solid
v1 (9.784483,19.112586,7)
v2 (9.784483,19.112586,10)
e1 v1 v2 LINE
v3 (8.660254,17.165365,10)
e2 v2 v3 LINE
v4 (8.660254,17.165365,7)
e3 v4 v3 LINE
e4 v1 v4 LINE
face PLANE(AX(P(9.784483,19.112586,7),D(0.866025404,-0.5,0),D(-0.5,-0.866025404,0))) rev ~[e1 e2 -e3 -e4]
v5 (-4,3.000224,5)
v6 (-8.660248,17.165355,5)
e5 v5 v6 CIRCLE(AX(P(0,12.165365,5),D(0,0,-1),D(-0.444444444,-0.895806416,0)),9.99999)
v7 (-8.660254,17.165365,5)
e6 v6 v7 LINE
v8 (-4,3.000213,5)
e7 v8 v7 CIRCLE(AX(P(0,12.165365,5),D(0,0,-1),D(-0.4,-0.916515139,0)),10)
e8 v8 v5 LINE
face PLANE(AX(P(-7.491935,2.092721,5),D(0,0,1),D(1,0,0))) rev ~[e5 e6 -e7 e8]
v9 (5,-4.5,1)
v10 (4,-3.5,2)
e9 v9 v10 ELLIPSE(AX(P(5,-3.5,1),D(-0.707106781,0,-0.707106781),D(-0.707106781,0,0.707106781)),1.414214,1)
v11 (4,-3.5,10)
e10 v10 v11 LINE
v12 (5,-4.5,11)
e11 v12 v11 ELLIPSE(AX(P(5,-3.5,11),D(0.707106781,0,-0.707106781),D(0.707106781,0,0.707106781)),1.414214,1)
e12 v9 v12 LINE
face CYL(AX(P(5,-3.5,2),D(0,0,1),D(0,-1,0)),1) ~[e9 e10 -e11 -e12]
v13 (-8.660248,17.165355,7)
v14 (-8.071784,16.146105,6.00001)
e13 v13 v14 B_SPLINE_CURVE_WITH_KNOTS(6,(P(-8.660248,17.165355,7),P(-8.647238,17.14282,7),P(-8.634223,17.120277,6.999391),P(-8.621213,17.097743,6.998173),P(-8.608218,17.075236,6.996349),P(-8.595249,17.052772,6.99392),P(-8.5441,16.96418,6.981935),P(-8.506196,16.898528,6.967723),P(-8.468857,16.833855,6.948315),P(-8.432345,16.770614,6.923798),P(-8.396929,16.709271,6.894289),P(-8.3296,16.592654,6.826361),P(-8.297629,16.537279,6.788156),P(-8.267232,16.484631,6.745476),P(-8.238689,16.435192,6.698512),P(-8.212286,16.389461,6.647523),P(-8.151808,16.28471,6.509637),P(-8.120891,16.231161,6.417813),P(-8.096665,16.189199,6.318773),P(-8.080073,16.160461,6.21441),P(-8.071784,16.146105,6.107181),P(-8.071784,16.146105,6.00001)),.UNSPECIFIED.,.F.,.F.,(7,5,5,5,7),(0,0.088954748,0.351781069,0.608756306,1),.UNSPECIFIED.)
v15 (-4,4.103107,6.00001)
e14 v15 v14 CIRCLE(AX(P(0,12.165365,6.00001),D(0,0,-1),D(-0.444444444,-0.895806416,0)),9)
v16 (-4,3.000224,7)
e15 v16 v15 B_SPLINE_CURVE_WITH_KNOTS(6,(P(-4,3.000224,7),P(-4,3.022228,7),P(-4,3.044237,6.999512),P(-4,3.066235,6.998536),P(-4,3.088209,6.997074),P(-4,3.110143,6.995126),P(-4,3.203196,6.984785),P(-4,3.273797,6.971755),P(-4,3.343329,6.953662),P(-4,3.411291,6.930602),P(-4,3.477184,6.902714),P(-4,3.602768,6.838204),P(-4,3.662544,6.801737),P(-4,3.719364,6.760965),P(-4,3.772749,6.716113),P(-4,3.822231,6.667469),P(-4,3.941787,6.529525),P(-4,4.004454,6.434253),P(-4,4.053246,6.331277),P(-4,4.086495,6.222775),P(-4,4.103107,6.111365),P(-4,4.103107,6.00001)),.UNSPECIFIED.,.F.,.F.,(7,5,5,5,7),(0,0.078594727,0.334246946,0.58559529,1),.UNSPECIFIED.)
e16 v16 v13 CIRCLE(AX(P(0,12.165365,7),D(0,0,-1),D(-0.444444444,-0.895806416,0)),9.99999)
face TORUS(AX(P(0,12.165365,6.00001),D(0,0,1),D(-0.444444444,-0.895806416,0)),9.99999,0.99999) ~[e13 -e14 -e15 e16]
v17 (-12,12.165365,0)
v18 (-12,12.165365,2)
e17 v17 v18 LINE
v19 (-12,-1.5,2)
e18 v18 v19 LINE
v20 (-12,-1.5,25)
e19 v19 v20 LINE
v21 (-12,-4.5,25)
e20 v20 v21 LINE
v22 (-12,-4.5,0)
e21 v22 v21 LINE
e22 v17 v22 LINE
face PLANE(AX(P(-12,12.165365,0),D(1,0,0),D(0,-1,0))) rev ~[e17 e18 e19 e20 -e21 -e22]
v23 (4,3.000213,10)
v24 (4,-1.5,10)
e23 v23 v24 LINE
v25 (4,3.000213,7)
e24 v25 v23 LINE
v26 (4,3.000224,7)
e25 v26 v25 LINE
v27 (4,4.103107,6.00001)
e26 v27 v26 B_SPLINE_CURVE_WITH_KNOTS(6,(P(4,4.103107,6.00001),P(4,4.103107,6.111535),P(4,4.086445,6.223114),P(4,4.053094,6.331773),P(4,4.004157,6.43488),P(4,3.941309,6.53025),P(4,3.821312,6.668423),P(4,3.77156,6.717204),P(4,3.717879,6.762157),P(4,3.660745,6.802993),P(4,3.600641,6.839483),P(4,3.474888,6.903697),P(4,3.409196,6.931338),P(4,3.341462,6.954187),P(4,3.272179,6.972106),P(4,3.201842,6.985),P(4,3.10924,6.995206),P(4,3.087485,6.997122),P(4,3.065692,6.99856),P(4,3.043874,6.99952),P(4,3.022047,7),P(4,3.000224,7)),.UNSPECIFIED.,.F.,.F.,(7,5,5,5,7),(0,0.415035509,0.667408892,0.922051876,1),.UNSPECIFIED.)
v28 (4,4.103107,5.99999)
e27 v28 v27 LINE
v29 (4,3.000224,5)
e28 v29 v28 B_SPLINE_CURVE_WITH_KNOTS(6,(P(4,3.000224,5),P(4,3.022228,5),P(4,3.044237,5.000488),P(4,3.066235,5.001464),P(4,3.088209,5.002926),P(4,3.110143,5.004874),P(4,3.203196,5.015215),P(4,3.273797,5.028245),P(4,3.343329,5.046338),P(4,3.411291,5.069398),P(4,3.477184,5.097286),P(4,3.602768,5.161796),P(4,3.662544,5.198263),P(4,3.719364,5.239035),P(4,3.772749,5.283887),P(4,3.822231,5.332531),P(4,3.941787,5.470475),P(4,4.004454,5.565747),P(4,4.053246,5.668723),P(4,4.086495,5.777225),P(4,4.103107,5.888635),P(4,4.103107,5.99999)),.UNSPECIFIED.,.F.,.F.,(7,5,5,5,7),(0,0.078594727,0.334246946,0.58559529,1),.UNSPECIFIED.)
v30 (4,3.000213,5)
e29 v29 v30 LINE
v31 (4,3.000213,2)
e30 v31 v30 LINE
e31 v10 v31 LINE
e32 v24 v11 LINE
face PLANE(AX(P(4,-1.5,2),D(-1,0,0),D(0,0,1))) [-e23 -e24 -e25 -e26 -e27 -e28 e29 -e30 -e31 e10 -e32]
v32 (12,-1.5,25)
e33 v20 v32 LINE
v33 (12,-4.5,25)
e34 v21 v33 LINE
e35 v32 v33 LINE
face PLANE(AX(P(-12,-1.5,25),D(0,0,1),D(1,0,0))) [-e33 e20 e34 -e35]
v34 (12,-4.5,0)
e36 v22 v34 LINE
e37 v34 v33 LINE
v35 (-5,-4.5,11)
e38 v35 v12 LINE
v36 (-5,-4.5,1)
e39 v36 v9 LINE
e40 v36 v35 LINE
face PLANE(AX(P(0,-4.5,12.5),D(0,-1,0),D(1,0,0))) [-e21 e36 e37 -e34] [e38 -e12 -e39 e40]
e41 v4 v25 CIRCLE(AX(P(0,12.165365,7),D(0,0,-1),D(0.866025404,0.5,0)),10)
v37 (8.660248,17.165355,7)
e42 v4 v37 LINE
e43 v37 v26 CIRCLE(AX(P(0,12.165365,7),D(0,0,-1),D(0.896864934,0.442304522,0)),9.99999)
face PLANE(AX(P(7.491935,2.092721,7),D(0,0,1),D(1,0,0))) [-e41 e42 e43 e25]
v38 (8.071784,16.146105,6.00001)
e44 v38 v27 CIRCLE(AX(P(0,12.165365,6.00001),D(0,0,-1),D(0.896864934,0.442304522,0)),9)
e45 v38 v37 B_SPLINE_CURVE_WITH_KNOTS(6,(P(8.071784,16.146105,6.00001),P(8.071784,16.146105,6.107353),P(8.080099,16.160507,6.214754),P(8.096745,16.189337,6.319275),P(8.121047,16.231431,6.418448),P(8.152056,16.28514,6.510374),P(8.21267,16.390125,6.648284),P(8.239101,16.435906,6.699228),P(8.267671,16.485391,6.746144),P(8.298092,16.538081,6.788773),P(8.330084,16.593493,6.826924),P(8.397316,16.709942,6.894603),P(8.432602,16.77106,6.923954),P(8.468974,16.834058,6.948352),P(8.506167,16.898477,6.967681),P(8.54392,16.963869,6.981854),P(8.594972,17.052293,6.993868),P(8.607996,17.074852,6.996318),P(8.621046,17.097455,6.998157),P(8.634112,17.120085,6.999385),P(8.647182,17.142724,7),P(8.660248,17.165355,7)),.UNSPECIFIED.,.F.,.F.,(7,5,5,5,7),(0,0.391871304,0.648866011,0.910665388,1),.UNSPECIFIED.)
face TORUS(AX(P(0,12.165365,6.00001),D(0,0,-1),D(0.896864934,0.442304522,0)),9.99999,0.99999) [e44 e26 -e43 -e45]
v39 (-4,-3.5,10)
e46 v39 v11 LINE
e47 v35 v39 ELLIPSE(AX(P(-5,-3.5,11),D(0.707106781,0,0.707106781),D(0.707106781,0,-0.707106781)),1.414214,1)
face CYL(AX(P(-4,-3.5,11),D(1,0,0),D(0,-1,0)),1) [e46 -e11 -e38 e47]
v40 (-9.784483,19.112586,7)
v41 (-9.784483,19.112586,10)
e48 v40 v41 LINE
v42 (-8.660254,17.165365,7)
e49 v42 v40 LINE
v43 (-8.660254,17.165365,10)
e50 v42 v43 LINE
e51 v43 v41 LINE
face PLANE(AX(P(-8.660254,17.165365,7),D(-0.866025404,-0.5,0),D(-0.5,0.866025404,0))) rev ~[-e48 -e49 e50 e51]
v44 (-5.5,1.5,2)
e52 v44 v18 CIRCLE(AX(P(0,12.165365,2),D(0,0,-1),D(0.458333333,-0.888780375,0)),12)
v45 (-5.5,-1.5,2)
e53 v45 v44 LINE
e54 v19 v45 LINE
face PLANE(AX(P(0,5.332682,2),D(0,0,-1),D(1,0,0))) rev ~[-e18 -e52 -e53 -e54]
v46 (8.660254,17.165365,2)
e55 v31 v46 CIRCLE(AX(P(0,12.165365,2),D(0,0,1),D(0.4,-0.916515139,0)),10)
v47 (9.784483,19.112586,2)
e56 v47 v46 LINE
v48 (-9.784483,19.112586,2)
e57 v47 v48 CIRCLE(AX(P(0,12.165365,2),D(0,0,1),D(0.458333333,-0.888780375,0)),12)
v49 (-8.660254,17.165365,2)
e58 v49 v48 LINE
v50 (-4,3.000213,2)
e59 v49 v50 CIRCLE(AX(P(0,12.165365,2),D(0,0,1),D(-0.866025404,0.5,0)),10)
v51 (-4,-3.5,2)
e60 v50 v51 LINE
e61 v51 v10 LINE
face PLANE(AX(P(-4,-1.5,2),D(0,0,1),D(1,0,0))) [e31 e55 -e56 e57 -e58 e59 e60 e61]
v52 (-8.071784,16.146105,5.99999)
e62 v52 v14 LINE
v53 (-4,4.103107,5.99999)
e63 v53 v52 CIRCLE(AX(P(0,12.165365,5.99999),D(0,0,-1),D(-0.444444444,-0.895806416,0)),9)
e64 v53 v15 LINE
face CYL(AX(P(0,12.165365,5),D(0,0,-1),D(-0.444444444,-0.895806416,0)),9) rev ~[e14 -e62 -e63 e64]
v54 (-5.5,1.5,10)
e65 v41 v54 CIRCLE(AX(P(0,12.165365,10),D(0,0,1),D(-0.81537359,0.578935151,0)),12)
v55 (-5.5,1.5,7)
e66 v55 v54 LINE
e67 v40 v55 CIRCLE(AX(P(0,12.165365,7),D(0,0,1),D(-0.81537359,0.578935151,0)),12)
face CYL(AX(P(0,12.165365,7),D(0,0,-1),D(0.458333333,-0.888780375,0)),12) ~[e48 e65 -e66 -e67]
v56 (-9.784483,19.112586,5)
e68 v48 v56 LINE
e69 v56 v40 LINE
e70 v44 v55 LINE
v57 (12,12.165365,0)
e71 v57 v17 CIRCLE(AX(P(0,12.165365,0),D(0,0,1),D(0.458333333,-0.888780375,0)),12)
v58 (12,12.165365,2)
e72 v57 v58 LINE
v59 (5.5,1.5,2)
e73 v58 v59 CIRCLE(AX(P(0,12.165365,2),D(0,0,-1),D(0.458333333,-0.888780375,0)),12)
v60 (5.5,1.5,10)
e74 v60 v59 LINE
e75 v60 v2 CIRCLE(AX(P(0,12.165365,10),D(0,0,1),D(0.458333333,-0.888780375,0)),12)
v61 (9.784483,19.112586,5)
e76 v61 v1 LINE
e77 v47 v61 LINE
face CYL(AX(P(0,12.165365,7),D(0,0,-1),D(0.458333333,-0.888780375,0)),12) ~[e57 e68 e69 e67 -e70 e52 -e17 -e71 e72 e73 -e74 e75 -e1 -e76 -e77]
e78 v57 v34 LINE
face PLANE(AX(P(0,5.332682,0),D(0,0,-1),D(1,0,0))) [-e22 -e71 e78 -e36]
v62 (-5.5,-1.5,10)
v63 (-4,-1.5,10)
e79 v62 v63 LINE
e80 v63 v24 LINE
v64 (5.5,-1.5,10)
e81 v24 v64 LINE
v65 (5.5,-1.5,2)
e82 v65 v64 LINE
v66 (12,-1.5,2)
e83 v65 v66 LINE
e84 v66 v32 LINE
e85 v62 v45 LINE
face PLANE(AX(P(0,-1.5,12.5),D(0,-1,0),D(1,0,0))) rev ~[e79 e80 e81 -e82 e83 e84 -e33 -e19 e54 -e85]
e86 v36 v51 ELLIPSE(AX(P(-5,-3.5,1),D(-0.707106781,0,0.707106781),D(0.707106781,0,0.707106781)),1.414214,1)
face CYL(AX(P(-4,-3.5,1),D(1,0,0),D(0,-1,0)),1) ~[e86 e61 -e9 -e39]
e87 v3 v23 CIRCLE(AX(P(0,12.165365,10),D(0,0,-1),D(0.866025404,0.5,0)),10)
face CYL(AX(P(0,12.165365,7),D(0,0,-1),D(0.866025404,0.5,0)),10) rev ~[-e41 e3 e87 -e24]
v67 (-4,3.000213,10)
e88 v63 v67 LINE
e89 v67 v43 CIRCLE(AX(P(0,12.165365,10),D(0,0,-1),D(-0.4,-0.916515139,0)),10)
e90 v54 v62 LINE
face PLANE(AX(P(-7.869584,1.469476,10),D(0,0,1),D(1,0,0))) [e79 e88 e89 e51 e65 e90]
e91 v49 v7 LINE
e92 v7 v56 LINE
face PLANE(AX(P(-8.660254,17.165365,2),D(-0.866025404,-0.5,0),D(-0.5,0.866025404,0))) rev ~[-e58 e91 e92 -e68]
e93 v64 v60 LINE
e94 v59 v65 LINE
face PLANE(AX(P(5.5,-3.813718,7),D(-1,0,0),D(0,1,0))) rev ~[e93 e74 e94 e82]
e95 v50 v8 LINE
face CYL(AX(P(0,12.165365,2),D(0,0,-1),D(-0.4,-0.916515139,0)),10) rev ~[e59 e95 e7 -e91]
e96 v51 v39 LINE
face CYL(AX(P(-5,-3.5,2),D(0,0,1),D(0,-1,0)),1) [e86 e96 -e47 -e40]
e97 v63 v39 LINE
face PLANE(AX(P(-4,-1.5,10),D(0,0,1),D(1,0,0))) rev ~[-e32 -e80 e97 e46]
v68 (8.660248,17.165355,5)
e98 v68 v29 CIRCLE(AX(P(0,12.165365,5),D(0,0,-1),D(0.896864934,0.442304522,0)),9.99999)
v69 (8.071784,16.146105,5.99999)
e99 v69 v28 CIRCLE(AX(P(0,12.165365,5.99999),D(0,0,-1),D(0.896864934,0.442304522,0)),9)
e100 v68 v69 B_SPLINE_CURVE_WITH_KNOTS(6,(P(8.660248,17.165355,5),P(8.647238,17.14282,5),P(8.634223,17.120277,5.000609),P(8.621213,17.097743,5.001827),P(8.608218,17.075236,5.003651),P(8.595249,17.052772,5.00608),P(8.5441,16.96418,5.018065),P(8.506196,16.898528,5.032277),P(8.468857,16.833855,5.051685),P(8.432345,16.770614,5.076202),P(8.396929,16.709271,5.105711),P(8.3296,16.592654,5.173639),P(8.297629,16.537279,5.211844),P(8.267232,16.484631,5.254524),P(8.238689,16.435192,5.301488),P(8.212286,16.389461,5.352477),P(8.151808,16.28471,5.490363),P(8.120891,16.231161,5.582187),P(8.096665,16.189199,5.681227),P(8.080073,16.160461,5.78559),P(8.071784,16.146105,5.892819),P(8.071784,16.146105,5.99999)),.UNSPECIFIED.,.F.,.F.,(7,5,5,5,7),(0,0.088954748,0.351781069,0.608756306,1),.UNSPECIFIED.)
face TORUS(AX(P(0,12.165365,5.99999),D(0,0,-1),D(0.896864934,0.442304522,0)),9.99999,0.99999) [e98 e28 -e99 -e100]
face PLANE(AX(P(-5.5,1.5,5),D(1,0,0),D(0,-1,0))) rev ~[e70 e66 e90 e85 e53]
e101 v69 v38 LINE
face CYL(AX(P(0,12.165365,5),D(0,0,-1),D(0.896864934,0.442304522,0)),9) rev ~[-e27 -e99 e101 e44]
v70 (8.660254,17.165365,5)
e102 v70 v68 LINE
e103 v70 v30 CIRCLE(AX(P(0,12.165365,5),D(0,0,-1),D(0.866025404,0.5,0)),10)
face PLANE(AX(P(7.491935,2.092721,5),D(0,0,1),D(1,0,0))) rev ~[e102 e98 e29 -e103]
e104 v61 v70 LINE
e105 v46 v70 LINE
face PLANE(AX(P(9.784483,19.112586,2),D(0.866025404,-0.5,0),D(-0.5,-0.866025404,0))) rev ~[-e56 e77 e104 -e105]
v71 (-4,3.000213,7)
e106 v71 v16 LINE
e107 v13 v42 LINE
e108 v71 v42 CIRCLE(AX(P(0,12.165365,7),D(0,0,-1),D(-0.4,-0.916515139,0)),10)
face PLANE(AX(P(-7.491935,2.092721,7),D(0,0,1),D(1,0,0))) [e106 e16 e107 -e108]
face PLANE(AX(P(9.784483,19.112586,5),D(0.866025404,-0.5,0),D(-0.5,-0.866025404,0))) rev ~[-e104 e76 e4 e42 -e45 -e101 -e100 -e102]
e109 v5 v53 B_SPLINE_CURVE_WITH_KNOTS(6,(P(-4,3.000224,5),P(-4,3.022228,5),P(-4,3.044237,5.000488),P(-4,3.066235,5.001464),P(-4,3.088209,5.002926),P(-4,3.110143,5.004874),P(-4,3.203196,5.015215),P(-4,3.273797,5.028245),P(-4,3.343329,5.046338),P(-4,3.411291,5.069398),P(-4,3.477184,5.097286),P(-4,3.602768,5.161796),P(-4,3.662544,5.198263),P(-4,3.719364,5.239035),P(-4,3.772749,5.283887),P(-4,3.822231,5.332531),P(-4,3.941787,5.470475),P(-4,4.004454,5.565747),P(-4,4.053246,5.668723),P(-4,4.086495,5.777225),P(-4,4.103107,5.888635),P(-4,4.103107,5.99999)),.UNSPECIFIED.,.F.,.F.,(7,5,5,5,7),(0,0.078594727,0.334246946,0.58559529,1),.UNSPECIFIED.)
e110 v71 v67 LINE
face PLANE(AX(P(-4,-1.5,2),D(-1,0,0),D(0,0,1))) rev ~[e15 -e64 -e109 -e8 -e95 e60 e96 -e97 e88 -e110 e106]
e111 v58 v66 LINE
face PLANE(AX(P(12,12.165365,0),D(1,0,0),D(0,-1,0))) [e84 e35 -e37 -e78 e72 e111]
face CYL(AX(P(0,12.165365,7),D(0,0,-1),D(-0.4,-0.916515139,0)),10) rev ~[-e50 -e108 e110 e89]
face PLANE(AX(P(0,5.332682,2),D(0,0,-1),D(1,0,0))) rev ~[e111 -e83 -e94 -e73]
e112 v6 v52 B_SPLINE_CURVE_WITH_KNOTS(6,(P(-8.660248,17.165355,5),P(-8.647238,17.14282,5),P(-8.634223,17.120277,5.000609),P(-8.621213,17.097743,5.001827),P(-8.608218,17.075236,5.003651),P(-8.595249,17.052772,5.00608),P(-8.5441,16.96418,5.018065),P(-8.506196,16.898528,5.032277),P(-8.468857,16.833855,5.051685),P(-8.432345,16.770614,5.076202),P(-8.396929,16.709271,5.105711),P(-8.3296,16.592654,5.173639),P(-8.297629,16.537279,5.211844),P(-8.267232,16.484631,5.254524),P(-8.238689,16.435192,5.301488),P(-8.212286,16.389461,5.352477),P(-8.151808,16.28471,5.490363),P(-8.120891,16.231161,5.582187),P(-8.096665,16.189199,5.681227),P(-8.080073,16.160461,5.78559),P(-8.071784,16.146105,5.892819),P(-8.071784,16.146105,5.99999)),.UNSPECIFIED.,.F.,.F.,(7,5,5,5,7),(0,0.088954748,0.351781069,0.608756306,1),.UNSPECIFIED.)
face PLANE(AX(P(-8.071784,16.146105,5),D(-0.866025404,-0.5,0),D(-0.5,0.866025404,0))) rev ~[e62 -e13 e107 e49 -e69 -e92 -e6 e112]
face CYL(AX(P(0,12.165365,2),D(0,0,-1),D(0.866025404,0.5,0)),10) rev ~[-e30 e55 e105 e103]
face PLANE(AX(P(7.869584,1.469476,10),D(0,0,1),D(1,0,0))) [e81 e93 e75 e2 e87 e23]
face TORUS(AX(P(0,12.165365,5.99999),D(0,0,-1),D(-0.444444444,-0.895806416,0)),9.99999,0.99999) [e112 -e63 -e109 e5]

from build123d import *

# Parameters (mm, degrees)
F1_DEPTH  = 2
F3_DEPTH  = 3
F5_DEPTH  = 2
F7_DEPTH  = 3
F8_R      = 0.99999
F9_W      = 24
F9_H      = 22.6653645039
F10_DEPTH = 10
F11_W     = 24
F11_H     = 25
F11_W_2   = 8
F11_H_2   = 8
F12_DEPTH = 3
F13_R     = 1
F14_W     = 24
F14_H     = 13.6653645039
F15_DEPTH = 2


# Not quite as in the source:
# - a fillet or chamfer is up to 0.001 mm smaller than in the source, because OpenCascade refuses the exact size


with BuildPart() as f1:
    # F0 (on Top) → F1 (new body)
    with BuildSketch(Plane.XY):
        with BuildLine():
            ThreePointArc((5.5, 1.5), (0, 24.1653645039), (-5.5, 1.5))
            Line((-5.5, 1.5), (-5.5, -1.5))
            ThreePointArc((-5.5, -1.5), (0, -24.1653645039), (5.5, -1.5))
            Line((5.5, -1.5), (5.5, 1.5))
        make_face()
    extrude(amount=F1_DEPTH)

    # F2 (on face) → F3 (join)
    with BuildSketch(Plane.XY.offset(2)):
        with BuildLine():
            Line((9.7844830762, 19.1125863177), (8.6602540378, 17.1653645039))
            ThreePointArc((8.6602540378, 17.1653645039), (9.4991255677, 9.0402063559), (4, 3.0002131139))
            Line((4, 3.0002131139), (4, -6.2432010007))
            Line((4, -6.2432010007), (9.1651513899, -16.1653645039))
            ThreePointArc((9.1651513899, -16.1653645039), (9.5868378212, -9.3206253964), (5.5, -3.8137179596))
            Line((5.5, -3.8137179596), (5.5, 1.5))
            ThreePointArc((5.5, 1.5), (11.6599594736, 9.3289327537), (9.7844830762, 19.1125863177))
        make_face()
        with BuildLine():
            ThreePointArc((-4, 3.0002131139), (-9.4991255677, 9.0402063559), (-8.6602540378, 17.1653645039))
            Line((-8.6602540378, 17.1653645039), (-9.7844830762, 19.1125863177))
            ThreePointArc((-9.7844830762, 19.1125863177), (-11.6599594736, 9.3289327537), (-5.5, 1.5))
            Line((-5.5, 1.5), (-5.5, -3.8137179596))
            ThreePointArc((-5.5, -3.8137179596), (-9.5868378212, -9.3206253964), (-9.1651513899, -16.1653645039))
            Line((-9.1651513899, -16.1653645039), (-4, -6.2432010007))
            Line((-4, -6.2432010007), (-4, 3.0002131139))
        make_face()
    extrude(amount=F3_DEPTH)

    # F4 (on face) → F5 (join)
    with BuildSketch(Plane.XY.offset(5)):
        with BuildLine():
            Line((-8.0717844057, 16.1461052023), (-9.7844830762, 19.1125863177))
            ThreePointArc((-9.7844830762, 19.1125863177), (-11.6599594736, 9.3289327537), (-5.5, 1.5))
            Line((-5.5, 1.5), (-5.5, -5.0414610795))
            ThreePointArc((-5.5, -5.0414610795), (-8.6043935433, -9.5263473097), (-8.5483759414, -14.980549891))
            Line((-8.5483759414, -14.980549891), (-4, -6.2432010007))
            Line((-4, -6.2432010007), (-4, 4.1031067556))
            ThreePointArc((-4, 4.1031067556), (-8.5258693153, 9.2827350759), (-8.0717844057, 16.1461052023))
        make_face()
        with BuildLine():
            ThreePointArc((5.5, 1.5), (11.6599594736, 9.3289327537), (9.7844830762, 19.1125863177))
            Line((9.7844830762, 19.1125863177), (8.0717844057, 16.1461052023))
            ThreePointArc((8.0717844057, 16.1461052023), (8.5258693153, 9.2827350759), (4, 4.1031067556))
            Line((4, 4.1031067556), (4, -6.2432010007))
            Line((4, -6.2432010007), (8.5483759414, -14.980549891))
            ThreePointArc((8.5483759414, -14.980549891), (8.6043935433, -9.5263473097), (5.5, -5.0414610795))
            Line((5.5, -5.0414610795), (5.5, 1.5))
        make_face()
    extrude(amount=F5_DEPTH)

    # F6 (on face) → F7 (join)
    with BuildSketch(Plane.XY.offset(7)):
        with BuildLine():
            Line((9.7844830762, 19.1125863177), (8.6602540378, 17.1653645039))
            ThreePointArc((8.6602540378, 17.1653645039), (9.4991255677, 9.0402063559), (4, 3.0002131139))
            Line((4, 3.0002131139), (4, -6.2432010007))
            Line((4, -6.2432010007), (9.1651513899, -16.1653645039))
            ThreePointArc((9.1651513899, -16.1653645039), (9.5868378212, -9.3206253964), (5.5, -3.8137179596))
            Line((5.5, -3.8137179596), (5.5, 1.5))
            ThreePointArc((5.5, 1.5), (11.6599594736, 9.3289327537), (9.7844830762, 19.1125863177))
        make_face()
        with BuildLine():
            ThreePointArc((-4, 3.0002131139), (-9.4991255677, 9.0402063559), (-8.6602540378, 17.1653645039))
            Line((-8.6602540378, 17.1653645039), (-9.7844830762, 19.1125863177))
            ThreePointArc((-9.7844830762, 19.1125863177), (-11.6599594736, 9.3289327537), (-5.5, 1.5))
            Line((-5.5, 1.5), (-5.5, -3.8137179596))
            ThreePointArc((-5.5, -3.8137179596), (-9.5868378212, -9.3206253964), (-9.1651513899, -16.1653645039))
            Line((-9.1651513899, -16.1653645039), (-4, -6.2432010007))
            Line((-4, -6.2432010007), (-4, 3.0002131139))
        make_face()
    extrude(amount=F7_DEPTH)

    # F8 (radius 1 in the source; OpenCascade refuses exactly that, so slightly less here)
    f8_edges = [f1.edges().sort_by_distance(p)[0] for p in [
        (8.525869, 9.282735, 7),
        (-8.525869, 9.282735, 7),
        (-8.525869, 9.282735, 5),
        (8.525869, 9.282735, 5),
        (-8.604394, -9.526347, 5),
        (-8.604394, -9.526347, 7),
        (8.604394, -9.526347, 7),
        (8.604394, -9.526347, 5),
    ]]
    fillet(f8_edges, radius=F8_R)

    # F9 (on face) → F10 (cut)
    with BuildSketch(Plane.XY.offset(10)):
        with Locations((0, -12.8326822519)):
            Rectangle(F9_W, F9_H)
    extrude(amount=-F10_DEPTH, mode=Mode.SUBTRACT)

    # F11 (on face) → F12 (join)
    with BuildSketch(Plane.XZ.offset(1.5)):
        with Locations((0, 12.5)):
            Rectangle(F11_W, F11_H)
        with Locations((0, 6)):
            Rectangle(F11_W_2, F11_H_2, mode=Mode.SUBTRACT)
    extrude(amount=F12_DEPTH)

    # F13
    f13_edges = [f1.edges().sort_by_distance(p)[0] for p in [
        (0, -4.5, 10),
        (4, -4.5, 6),
        (0, -4.5, 2),
        (-4, -4.5, 6),
    ]]
    fillet(f13_edges, radius=F13_R)

    # F14 (on face) → F15 (join)
    with BuildSketch(Plane(origin=(0, 0, 0), x_dir=(1, 0, 0), z_dir=(0, 0, -1))):
        with Locations((0, -5.3326822519)):
            Rectangle(F14_W, F14_H)
    extrude(amount=-F15_DEPTH)


solid = f1.part
